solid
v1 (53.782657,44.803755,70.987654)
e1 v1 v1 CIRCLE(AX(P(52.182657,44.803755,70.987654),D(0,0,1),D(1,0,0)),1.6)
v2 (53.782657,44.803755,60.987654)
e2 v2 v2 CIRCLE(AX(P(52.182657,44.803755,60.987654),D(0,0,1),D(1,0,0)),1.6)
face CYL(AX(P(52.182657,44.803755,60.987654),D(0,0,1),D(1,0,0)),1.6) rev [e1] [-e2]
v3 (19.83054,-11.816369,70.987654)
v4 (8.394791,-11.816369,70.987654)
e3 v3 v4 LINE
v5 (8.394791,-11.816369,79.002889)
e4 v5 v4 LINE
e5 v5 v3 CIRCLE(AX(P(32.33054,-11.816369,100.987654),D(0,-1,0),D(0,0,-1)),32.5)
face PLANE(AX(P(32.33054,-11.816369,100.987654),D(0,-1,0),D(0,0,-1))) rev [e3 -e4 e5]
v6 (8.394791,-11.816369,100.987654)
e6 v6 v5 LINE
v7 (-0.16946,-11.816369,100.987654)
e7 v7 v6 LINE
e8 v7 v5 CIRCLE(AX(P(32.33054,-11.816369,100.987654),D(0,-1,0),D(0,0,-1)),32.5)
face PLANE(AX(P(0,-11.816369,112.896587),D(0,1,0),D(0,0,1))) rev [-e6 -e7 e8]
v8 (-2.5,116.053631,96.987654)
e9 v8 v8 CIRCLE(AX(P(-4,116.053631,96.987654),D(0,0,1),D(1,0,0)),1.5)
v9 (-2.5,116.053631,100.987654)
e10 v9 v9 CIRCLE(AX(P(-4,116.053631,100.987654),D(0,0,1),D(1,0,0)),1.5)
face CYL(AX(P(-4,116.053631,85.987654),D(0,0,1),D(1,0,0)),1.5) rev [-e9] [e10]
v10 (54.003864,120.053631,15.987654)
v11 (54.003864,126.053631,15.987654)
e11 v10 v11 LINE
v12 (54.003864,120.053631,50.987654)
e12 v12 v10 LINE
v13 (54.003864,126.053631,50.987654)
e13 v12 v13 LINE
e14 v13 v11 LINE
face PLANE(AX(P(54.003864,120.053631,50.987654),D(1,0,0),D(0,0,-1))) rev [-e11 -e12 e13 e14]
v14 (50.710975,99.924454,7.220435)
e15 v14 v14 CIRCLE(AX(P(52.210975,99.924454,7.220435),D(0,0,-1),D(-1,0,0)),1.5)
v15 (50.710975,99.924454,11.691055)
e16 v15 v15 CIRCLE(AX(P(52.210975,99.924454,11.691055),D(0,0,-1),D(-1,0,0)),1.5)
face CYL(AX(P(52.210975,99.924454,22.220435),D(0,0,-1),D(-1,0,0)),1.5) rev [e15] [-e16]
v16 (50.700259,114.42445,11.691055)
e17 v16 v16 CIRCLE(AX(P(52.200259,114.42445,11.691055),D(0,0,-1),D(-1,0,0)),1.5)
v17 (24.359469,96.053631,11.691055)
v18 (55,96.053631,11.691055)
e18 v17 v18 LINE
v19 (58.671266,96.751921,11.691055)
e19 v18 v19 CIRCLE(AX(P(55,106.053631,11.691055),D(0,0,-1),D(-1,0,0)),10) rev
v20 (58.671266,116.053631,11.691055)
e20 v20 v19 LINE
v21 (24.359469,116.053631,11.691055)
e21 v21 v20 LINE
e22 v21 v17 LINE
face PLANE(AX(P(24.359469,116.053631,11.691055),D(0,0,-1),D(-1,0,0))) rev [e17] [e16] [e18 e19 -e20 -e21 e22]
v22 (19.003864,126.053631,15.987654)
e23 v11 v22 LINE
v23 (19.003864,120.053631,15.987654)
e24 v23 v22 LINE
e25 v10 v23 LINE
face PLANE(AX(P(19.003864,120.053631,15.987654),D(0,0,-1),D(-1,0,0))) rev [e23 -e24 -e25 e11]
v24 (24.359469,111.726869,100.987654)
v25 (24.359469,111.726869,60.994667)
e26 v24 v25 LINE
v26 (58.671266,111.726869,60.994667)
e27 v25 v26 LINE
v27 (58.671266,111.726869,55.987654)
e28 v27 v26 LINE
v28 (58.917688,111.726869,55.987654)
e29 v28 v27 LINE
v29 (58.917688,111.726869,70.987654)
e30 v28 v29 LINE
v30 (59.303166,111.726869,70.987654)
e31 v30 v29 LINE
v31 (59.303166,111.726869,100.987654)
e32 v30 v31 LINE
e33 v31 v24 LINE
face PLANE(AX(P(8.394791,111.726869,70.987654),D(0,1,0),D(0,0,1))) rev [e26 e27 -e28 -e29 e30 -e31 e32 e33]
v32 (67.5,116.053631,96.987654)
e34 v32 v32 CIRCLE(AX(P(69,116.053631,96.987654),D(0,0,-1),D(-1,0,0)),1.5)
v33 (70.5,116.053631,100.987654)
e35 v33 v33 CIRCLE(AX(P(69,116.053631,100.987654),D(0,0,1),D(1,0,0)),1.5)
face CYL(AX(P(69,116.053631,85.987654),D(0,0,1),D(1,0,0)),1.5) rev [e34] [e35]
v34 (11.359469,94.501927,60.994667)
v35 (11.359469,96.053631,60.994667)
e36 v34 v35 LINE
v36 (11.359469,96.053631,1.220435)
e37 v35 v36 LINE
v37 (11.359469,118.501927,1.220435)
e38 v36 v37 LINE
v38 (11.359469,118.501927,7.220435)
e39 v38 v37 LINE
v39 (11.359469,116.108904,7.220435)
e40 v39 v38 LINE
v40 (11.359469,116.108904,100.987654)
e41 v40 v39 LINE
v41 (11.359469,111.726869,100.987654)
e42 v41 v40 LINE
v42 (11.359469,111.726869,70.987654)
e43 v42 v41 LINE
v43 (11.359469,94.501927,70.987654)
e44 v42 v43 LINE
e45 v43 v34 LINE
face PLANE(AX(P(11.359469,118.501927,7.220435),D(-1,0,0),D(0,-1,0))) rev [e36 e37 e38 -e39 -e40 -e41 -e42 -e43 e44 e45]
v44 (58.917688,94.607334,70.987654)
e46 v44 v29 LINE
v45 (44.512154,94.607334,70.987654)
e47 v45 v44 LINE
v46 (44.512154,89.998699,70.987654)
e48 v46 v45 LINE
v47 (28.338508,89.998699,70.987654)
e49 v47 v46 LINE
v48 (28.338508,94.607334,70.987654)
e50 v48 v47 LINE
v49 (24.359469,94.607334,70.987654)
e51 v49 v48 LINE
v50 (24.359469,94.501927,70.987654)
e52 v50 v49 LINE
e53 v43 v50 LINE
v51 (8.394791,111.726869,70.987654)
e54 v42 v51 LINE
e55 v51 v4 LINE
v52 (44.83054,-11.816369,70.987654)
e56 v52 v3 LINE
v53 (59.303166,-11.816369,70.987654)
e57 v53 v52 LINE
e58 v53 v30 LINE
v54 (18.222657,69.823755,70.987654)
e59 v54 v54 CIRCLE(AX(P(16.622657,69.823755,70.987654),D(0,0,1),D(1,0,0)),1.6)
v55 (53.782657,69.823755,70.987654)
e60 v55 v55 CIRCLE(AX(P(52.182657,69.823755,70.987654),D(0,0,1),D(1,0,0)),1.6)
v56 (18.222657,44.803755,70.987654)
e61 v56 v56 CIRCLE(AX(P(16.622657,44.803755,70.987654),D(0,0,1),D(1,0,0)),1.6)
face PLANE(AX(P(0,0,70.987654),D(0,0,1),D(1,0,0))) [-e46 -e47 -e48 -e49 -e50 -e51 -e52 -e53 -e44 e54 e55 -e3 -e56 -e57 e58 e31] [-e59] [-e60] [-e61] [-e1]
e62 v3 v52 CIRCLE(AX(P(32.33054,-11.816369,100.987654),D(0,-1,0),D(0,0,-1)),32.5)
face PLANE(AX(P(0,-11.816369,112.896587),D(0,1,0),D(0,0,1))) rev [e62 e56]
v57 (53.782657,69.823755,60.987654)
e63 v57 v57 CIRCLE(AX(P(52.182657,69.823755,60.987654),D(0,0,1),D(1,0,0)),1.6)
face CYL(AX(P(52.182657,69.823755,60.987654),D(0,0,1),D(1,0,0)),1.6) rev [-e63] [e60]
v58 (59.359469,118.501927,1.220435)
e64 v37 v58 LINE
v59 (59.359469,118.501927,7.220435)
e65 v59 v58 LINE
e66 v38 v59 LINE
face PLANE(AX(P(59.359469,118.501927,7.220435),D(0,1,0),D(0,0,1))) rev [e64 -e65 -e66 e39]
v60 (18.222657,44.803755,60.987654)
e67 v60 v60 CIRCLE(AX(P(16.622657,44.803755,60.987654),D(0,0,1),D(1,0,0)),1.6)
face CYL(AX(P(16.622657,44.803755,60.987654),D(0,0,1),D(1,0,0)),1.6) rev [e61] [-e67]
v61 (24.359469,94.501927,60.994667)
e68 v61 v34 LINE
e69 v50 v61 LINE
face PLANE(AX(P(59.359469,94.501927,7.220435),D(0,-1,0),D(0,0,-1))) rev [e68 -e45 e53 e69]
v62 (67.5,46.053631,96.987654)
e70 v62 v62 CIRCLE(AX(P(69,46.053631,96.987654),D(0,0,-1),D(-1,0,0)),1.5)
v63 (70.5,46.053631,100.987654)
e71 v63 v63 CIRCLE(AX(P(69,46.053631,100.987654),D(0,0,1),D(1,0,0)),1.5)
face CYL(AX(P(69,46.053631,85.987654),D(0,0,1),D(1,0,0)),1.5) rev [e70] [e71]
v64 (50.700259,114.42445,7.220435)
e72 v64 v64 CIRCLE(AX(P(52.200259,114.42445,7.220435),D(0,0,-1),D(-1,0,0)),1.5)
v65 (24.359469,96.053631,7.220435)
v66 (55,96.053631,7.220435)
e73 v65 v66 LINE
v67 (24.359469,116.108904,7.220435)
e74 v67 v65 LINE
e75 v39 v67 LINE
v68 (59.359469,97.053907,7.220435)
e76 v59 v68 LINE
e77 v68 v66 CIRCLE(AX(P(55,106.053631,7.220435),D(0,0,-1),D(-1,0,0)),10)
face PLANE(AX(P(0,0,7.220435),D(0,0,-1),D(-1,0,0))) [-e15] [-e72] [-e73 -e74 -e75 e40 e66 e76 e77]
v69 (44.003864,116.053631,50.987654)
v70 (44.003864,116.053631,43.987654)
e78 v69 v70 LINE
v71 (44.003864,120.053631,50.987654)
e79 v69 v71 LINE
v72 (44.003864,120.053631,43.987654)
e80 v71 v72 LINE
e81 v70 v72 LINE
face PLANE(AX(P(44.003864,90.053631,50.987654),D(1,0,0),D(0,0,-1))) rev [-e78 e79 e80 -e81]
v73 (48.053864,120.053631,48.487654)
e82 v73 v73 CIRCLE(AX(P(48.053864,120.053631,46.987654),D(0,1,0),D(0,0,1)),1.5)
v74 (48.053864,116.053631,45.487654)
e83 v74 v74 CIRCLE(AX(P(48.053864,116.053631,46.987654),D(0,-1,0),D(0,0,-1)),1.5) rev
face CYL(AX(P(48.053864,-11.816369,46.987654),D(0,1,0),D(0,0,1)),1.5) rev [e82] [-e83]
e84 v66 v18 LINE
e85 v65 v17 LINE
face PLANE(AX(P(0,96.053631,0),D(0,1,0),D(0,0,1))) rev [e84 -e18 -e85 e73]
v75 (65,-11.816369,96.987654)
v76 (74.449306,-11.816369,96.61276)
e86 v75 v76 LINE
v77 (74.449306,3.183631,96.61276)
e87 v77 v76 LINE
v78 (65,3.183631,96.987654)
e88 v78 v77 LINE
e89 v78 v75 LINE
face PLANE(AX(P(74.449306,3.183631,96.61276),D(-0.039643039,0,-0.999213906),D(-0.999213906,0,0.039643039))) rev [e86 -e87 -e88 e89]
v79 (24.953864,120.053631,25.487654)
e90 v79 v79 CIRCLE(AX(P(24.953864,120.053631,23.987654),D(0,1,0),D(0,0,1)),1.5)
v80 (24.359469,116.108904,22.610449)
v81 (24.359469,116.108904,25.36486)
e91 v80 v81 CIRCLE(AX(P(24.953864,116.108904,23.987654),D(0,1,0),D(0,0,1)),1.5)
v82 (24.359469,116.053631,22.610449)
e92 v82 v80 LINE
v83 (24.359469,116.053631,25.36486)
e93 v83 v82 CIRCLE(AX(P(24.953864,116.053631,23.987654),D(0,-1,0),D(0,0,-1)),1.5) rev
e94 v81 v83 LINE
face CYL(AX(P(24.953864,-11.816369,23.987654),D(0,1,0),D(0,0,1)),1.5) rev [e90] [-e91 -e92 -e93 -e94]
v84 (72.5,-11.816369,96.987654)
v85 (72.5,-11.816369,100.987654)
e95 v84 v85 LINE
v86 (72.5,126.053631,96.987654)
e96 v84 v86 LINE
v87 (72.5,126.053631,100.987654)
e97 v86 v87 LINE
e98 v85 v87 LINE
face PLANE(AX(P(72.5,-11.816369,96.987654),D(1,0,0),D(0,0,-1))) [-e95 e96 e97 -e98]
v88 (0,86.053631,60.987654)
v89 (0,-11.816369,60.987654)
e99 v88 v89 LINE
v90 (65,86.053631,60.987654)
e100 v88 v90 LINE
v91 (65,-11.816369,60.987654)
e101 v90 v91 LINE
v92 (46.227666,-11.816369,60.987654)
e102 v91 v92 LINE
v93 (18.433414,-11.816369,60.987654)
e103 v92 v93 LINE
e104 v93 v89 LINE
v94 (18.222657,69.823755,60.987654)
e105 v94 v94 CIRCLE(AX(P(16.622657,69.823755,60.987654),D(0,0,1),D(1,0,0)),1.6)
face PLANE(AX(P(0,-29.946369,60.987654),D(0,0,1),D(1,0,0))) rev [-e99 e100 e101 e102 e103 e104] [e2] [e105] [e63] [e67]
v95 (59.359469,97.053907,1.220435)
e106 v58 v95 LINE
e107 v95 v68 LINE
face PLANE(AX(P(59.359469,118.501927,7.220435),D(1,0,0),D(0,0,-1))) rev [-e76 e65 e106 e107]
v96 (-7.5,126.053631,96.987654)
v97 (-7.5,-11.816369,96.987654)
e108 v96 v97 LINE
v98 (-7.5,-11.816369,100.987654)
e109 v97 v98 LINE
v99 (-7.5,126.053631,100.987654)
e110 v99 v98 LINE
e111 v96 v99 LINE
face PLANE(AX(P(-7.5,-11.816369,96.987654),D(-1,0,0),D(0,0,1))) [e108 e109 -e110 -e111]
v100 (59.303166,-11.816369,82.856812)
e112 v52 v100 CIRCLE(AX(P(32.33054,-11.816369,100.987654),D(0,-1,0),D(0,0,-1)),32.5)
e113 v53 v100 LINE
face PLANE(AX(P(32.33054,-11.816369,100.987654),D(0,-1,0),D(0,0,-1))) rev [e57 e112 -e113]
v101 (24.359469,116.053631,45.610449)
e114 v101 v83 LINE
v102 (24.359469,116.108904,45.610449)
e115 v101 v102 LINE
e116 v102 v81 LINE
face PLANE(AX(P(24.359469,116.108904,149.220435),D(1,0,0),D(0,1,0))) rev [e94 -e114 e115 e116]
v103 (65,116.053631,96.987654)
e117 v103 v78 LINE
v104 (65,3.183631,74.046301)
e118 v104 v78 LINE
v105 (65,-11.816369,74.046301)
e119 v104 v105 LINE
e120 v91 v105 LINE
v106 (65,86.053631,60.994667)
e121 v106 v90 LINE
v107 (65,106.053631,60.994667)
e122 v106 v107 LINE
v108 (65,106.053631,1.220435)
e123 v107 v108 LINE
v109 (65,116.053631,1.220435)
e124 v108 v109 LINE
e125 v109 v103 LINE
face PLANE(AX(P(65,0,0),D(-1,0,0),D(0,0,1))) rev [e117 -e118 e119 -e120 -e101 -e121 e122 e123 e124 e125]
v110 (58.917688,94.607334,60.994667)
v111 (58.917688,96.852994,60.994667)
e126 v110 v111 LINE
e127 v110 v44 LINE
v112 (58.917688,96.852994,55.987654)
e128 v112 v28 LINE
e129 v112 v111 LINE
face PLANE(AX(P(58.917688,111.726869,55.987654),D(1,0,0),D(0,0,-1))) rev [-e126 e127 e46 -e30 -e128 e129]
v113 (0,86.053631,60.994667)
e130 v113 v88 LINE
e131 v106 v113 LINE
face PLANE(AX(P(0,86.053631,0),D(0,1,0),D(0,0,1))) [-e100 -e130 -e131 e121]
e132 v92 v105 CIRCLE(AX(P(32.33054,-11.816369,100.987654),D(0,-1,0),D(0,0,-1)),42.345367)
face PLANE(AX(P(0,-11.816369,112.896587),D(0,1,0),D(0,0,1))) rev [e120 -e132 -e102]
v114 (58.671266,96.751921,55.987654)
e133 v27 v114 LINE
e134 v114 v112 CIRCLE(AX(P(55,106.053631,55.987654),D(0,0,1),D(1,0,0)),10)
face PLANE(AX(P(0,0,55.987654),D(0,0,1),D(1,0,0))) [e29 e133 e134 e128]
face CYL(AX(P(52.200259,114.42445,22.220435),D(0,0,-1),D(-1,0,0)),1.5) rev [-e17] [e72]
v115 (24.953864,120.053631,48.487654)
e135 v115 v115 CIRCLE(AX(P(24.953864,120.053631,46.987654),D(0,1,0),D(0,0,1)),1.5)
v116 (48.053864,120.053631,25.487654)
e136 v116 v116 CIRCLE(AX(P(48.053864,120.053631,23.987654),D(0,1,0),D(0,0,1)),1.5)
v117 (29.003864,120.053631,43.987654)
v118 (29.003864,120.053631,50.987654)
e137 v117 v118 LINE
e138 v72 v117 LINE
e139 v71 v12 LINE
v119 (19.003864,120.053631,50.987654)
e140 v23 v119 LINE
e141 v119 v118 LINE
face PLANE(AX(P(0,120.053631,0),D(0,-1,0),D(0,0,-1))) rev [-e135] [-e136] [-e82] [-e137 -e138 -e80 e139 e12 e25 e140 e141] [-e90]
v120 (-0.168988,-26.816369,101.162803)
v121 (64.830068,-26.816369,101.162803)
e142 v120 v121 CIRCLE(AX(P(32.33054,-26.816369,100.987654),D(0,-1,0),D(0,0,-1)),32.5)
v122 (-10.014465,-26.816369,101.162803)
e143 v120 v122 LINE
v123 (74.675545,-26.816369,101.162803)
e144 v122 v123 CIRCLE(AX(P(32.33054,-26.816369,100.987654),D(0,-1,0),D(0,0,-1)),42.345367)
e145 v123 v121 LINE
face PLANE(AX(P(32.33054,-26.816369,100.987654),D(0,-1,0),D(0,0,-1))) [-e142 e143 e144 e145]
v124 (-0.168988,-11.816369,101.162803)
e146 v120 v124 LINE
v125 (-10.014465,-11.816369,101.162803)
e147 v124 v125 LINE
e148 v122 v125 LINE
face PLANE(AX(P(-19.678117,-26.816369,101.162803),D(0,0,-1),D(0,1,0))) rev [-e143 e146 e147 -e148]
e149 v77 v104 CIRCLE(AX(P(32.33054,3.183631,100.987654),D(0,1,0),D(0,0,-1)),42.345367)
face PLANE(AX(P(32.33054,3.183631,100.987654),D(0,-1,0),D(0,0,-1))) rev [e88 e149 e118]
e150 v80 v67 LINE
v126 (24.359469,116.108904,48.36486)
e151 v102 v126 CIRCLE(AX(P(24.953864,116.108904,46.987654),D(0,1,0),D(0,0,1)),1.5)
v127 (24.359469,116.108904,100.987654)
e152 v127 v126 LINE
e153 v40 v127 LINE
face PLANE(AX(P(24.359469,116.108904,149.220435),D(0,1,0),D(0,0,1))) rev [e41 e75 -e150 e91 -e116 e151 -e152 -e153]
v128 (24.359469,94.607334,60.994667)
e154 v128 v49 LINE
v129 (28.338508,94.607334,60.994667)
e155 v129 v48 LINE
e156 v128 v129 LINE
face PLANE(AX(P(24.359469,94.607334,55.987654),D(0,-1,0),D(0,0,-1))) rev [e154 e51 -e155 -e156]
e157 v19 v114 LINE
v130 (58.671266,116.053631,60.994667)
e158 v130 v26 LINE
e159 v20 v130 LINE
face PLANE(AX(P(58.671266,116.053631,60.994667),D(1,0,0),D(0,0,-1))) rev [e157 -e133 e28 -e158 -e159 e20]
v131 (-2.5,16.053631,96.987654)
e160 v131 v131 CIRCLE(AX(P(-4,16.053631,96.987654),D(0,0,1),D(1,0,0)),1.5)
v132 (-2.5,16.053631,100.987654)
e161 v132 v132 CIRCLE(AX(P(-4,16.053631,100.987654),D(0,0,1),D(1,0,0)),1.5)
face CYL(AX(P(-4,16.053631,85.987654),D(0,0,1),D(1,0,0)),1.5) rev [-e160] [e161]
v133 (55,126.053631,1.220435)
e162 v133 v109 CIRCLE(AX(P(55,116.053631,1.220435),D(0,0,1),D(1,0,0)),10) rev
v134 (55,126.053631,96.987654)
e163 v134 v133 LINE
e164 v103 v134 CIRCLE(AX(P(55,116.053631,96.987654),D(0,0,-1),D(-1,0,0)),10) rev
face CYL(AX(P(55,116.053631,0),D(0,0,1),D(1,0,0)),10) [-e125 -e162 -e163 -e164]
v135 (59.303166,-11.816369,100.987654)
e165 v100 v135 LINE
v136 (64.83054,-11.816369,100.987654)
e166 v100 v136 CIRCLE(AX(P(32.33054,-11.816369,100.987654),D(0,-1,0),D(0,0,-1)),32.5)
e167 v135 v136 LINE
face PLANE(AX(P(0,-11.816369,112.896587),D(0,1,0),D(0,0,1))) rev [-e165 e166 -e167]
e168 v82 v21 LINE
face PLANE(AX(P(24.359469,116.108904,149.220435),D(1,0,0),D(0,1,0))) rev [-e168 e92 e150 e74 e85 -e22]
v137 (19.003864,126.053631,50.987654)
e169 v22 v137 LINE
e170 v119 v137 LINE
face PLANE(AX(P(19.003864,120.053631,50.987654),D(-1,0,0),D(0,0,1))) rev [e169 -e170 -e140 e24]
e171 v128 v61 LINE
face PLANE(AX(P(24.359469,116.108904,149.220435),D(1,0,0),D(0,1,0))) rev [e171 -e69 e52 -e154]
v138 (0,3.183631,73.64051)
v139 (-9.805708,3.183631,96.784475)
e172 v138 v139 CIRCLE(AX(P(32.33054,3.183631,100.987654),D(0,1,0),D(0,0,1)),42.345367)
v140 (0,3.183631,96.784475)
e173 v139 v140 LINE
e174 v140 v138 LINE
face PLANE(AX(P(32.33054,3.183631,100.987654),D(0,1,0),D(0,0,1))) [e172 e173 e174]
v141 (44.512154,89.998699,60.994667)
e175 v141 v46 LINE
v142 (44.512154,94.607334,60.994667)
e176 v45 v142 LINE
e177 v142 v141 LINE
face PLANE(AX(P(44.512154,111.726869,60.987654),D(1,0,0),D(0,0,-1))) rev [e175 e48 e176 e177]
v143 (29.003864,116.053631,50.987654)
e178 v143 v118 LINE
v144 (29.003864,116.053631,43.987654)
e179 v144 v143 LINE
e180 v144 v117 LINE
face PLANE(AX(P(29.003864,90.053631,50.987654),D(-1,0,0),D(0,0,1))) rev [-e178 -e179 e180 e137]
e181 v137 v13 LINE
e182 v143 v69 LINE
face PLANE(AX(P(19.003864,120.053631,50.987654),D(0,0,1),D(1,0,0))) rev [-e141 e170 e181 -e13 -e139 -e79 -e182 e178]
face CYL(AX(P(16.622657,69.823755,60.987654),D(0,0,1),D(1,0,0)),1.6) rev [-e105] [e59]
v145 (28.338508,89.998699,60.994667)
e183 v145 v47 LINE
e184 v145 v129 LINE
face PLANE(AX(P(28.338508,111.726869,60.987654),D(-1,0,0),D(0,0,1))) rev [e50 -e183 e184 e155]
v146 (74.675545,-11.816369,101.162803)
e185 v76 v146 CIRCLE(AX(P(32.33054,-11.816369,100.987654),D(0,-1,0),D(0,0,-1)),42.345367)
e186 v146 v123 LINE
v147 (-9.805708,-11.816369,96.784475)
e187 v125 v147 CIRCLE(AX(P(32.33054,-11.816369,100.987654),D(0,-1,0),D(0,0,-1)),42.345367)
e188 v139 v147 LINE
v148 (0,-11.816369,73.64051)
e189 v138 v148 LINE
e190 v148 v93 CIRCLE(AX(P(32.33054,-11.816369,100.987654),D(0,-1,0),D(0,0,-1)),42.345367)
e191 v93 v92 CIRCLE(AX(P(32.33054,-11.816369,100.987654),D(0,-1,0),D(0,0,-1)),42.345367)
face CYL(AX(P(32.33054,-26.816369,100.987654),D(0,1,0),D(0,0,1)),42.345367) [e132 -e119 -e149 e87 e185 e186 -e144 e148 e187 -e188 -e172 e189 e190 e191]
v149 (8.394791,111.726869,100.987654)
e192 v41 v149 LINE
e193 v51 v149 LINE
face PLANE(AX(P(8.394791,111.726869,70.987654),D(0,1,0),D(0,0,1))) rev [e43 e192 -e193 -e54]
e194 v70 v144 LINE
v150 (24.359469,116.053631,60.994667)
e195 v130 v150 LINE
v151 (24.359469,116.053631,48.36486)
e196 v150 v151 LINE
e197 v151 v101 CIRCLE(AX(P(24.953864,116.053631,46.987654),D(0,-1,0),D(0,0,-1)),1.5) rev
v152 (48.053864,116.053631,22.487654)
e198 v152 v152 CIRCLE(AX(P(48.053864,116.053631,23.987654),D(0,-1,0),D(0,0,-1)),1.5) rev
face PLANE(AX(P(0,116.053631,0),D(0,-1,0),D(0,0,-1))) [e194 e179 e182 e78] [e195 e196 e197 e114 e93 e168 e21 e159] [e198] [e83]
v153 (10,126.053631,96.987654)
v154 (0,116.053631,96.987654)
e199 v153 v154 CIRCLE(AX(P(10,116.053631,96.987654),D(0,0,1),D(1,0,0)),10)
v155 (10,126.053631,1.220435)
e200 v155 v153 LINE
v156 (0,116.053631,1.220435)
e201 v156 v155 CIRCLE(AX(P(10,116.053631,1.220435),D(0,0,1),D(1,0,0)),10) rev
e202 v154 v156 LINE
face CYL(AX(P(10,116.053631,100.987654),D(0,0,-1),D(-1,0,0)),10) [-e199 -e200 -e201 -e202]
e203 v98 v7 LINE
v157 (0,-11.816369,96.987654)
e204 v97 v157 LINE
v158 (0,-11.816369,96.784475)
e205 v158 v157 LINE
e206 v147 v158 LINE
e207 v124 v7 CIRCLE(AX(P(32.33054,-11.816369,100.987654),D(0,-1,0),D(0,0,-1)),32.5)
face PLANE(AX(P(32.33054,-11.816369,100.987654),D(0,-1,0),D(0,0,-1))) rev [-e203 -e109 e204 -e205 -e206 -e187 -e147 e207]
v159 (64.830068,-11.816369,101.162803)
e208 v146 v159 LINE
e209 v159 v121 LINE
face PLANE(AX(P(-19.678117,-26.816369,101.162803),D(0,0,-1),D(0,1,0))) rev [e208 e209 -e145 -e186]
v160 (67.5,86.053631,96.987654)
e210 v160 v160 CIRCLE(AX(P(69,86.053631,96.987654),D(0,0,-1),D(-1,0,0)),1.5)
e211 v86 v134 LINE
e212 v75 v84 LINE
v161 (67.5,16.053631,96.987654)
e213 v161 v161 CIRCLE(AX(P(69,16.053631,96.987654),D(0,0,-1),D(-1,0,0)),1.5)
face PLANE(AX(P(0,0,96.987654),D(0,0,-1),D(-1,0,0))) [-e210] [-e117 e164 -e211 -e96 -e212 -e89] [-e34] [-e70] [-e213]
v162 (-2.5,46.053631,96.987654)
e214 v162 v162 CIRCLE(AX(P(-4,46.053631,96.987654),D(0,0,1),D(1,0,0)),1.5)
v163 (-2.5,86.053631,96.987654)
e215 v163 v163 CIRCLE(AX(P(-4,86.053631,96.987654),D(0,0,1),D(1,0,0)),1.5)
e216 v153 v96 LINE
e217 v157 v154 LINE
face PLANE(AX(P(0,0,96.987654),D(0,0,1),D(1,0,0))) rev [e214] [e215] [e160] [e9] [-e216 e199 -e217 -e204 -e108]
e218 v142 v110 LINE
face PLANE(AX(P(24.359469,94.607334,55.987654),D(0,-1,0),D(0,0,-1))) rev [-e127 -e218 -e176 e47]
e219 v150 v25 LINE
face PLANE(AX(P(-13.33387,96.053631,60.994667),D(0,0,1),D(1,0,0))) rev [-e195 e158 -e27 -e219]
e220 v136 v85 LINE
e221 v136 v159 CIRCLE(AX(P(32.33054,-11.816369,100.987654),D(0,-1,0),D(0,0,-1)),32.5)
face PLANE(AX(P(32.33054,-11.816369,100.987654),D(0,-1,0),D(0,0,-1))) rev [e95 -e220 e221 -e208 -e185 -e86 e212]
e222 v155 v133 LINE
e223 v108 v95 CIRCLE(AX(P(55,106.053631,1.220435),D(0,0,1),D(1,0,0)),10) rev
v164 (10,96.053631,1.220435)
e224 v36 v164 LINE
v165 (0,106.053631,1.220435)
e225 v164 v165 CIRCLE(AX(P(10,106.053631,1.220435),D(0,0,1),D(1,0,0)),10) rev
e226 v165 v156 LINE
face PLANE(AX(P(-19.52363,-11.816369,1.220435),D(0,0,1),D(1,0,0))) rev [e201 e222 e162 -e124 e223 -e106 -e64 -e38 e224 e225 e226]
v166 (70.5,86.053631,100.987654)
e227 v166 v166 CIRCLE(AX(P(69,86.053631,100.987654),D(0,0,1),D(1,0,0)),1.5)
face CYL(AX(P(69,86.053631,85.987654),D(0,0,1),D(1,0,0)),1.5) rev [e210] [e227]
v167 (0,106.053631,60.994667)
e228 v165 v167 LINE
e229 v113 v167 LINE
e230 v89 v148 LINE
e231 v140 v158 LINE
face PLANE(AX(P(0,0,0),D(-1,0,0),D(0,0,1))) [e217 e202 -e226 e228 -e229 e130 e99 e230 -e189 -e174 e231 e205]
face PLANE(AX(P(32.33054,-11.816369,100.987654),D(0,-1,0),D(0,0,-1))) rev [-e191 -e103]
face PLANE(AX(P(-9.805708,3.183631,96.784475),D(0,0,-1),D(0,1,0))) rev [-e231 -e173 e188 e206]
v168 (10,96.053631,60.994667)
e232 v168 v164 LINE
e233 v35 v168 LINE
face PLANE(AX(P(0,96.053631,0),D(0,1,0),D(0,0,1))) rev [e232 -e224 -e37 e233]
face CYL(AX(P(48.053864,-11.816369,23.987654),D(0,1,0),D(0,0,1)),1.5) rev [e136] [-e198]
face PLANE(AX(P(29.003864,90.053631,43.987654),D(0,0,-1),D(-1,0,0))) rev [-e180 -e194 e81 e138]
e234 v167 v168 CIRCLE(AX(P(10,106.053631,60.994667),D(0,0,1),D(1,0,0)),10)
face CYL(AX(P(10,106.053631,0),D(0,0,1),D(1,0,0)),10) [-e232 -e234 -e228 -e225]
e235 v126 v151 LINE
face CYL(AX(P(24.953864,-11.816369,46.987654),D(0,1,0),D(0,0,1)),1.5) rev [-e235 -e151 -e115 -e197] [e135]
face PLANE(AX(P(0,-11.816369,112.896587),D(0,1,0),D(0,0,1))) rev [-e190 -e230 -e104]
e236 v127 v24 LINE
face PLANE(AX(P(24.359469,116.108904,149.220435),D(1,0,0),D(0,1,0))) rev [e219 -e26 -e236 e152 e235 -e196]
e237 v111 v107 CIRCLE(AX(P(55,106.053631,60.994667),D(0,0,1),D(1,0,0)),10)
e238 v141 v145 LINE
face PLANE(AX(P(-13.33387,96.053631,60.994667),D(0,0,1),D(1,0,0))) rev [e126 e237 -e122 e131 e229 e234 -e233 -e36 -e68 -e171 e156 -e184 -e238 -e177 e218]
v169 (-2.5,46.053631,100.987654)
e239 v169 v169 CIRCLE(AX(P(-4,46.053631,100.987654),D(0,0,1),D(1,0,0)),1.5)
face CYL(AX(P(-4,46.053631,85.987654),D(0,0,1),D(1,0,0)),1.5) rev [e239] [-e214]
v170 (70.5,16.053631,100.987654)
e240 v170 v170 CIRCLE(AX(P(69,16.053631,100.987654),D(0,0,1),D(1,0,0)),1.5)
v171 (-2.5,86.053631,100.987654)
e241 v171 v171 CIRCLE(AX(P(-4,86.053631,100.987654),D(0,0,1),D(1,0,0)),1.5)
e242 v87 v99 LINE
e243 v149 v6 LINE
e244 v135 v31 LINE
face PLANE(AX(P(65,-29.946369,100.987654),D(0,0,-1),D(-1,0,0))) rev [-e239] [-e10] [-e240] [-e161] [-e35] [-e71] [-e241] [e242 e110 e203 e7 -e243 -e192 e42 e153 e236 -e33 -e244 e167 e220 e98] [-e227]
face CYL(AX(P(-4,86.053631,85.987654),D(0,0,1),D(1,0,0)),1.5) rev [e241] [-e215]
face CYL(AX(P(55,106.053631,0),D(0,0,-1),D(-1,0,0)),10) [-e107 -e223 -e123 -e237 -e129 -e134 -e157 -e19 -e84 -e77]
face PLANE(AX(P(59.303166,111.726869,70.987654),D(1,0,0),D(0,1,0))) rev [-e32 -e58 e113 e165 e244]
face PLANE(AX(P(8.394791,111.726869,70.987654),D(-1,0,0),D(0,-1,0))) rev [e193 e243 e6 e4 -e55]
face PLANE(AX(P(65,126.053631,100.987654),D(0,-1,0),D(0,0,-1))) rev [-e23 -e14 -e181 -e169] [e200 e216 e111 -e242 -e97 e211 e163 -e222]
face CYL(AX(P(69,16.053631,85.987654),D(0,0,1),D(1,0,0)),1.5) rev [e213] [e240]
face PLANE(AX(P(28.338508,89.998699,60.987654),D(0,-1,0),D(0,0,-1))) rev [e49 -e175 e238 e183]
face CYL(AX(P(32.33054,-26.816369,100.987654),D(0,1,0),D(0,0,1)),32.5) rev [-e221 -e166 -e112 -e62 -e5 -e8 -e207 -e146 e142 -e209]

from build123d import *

# Parameters (mm, degrees)
SKETCH_1_W           = 158.76721969
SKETCH_1_H           = 156
EXTRUDE_1_DEPTH      = 65
SKETCH_2_W           = 158.85328248
SKETCH_2_H           = 116
CUT_EXTRUDE_1_DEPTH  = 175.106359002
SKETCH_3_W           = 50.908374927
SKETCH_3_H           = 145.199783254
CUT_EXTRUDE_2_DEPTH  = 30
SKETCH_4_W           = 35
SKETCH_4_H           = 35
CUT_EXTRUDE_3_DEPTH  = 6
SKETCH_5_W           = 15
SKETCH_5_H           = 7
CUT_EXTRUDE_4_DEPTH  = 30
SKETCH_6_W           = 16.173646408
SKETCH_6_H           = 21.728169507
CUT_EXTRUDE_5_DEPTH  = 10
SKETCH_12_W          = 86.243953328
SKETCH_12_H          = 39.310546327
CUT_EXTRUDE_8_DEPTH  = 175.106359002
SKETCH_9_W           = 48
SKETCH_9_H           = 24
CUT_EXTRUDE_6_DEPTH  = 65
SKETCH_10_W          = 13
SKETCH_10_H          = 21.606977086
CUT_EXTRUDE_7_DEPTH  = 142
SKETCH_14_W          = 115.071710401
SKETCH_14_H          = 109.204529419
CUT_EXTRUDE_9_DEPTH  = 183.843220343
SKETCH_17_W          = 7.5
SKETCH_17_H          = 137.87
EXTRUDE_2_DEPTH      = 4
SKETCH_16_R          = 1.5
CUT_EXTRUDE_10_DEPTH = 182.230387146
SKETCH_18_W          = 105.560370757
SKETCH_18_H          = 69.761390661
CUT_EXTRUDE_11_DEPTH = 10
SKETCH_20_W          = 34.311797321
SKETCH_20_H          = 49.303612094
CUT_EXTRUDE_12_DEPTH = 20
SKETCH_21_R          = 1.5
CUT_EXTRUDE_13_DEPTH = 15
SKETCH_22_W          = 34.558218505
SKETCH_22_H          = 17.119534262
CUT_EXTRUDE_14_DEPTH = 15
SKETCH_23_R          = 1.5
CUT_EXTRUDE_15_DEPTH = 15
SKETCH_28_R          = 1.6
CUT_EXTRUDE_17_DEPTH = 10
FILLET_5_R           = 10
FILLET_6_R           = 10
SKETCH_24_R          = 42.345367042
SKETCH_24_R_2        = 32.5
EXTRUDE_3_DEPTH      = 15
EXTRUDE_START        = 15
EXTRUDE_4_DEPTH      = 15
EXTRUDE_5_DEPTH      = 15
SKETCH_31_W          = 132.972003353
SKETCH_31_H          = 50.361945542
CUT_EXTRUDE_18_DEPTH = 15


with BuildPart() as part:
    # 草图1 → 凸台-拉伸1 (new body)
    with BuildSketch(Plane(origin=(0, 0, 0), x_dir=(0, 0, -1), z_dir=(1, 0, 0))):
        with Locations((-21.604044476, 48.053631124)):
            Rectangle(SKETCH_1_W, SKETCH_1_H)
    extrude(amount=EXTRUDE_1_DEPTH)

    # 草图2 → 切除-拉伸1 (cut, through all)
    with BuildSketch(Plane(origin=(65, 0, 0), x_dir=(0, 0, -1), z_dir=(1, 0, 0))):
        with Locations((18.438986919, 28.053631124)):
            Rectangle(SKETCH_2_W, SKETCH_2_H)
    extrude(amount=-CUT_EXTRUDE_1_DEPTH, mode=Mode.SUBTRACT)

    # 草图3 → 切除-拉伸2 (cut)
    with BuildSketch(Plane.XY.offset(100.987654321)):
        with Locations((33.848978786, 39.12697696)):
            Rectangle(SKETCH_3_W, SKETCH_3_H)
    extrude(amount=-CUT_EXTRUDE_2_DEPTH, mode=Mode.SUBTRACT)

    # 草图4 → 切除-拉伸3 (cut)
    with BuildSketch(Plane(origin=(0, 126.053631124, 0), x_dir=(1, 0, 0), z_dir=(0, 1, 0))):
        with Locations((36.50386385, -33.487654321)):
            Rectangle(SKETCH_4_W, SKETCH_4_H)
    extrude(amount=-CUT_EXTRUDE_3_DEPTH, mode=Mode.SUBTRACT)

    # 草图5 → 切除-拉伸4 (cut)
    with BuildSketch(Plane(origin=(0, 120.053631124, 0), x_dir=(1, 0, 0), z_dir=(0, 1, 0))):
        with Locations((36.50386385, -47.487654321)):
            Rectangle(SKETCH_5_W, SKETCH_5_H)
    extrude(amount=-CUT_EXTRUDE_4_DEPTH, mode=Mode.SUBTRACT)

    # 草图6 → 切除-拉伸5 (cut)
    with BuildSketch(Plane.XY.offset(70.987654321)):
        with Locations((36.425330815, 100.862783834)):
            Rectangle(SKETCH_6_W, SKETCH_6_H)
    extrude(amount=-CUT_EXTRUDE_5_DEPTH, mode=Mode.SUBTRACT)

    # 草图12 → 切除-拉伸8 (cut, through all)
    with BuildSketch(Plane(origin=(65, 0, 0), x_dir=(0, 0, -1), z_dir=(1, 0, 0))):
        with Locations((-69.77461077, -31.47164204)):
            Rectangle(SKETCH_12_W, SKETCH_12_H)
    extrude(amount=-CUT_EXTRUDE_8_DEPTH, mode=Mode.SUBTRACT)

    # 草图9 → 切除-拉伸6 (cut)
    with BuildSketch(Plane(origin=(0, 0, -57.779565369), x_dir=(-1, 0, 0), z_dir=(0, 0, -1))):
        with Locations((-35.359469061, 106.501927087)):
            Rectangle(SKETCH_9_W, SKETCH_9_H)
    extrude(amount=-CUT_EXTRUDE_6_DEPTH, mode=Mode.SUBTRACT)

    # 草图10 → 切除-拉伸7 (cut)
    with BuildSketch(Plane(origin=(0, 0, 7.220434631), x_dir=(-1, 0, 0), z_dir=(0, 0, -1))):
        with Locations((-17.859469061, 105.30541563)):
            Rectangle(SKETCH_10_W, SKETCH_10_H)
    extrude(amount=-CUT_EXTRUDE_7_DEPTH, mode=Mode.SUBTRACT)

    # 草图14 → 切除-拉伸9 (cut, through all)
    with BuildSketch(Plane(origin=(0, 126.053631124, 0), x_dir=(1, 0, 0), z_dir=(0, 1, 0))):
        with Locations((38.012225103, 53.381830079)):
            Rectangle(SKETCH_14_W, SKETCH_14_H)
    extrude(amount=-CUT_EXTRUDE_9_DEPTH, mode=Mode.SUBTRACT)

    # 草图17 → 凸台-拉伸2 (add)
    with BuildSketch(Plane.XY.offset(100.987654321)):
        with Locations((-3.75, 57.118631124)):
            Rectangle(SKETCH_17_W, SKETCH_17_H)
        with Locations((68.75, 57.118631124)):
            Rectangle(SKETCH_17_W, SKETCH_17_H)
    extrude(amount=-EXTRUDE_2_DEPTH)

    # 草图16 → 切除-拉伸10 (cut, through all)
    with BuildSketch(Plane(origin=(0, 120.053631124, 0), x_dir=(1, 0, 0), z_dir=(0, 1, 0))):
        with Locations(Location((24.95386385, -46.987654321, 0), (0, 0, 270))):
            Circle(SKETCH_16_R)
        with Locations(Location((48.05386385, -46.987654321, 0), (0, 0, 270))):
            Circle(SKETCH_16_R)
        with Locations(Location((24.95386385, -23.987654321, 0), (0, 0, 270))):
            Circle(SKETCH_16_R)
        with Locations(Location((48.05386385, -23.987654321, 0), (0, 0, 270))):
            Circle(SKETCH_16_R)
    extrude(amount=-CUT_EXTRUDE_10_DEPTH, mode=Mode.SUBTRACT)

    # 草图18 → 切除-拉伸11 (cut)
    with BuildSketch(Plane.XZ.offset(-86.053631124)):
        with Locations((39.446315854, 26.113971664)):
            Rectangle(SKETCH_18_W, SKETCH_18_H)
    extrude(amount=-CUT_EXTRUDE_11_DEPTH, mode=Mode.SUBTRACT)

    # 草图20 → 切除-拉伸12 (cut)
    with BuildSketch(Plane.XZ.offset(-96.053631124)):
        with Locations((41.515367722, 36.342860947)):
            Rectangle(SKETCH_20_W, SKETCH_20_H)
    extrude(amount=-CUT_EXTRUDE_12_DEPTH, mode=Mode.SUBTRACT)

    # 草图21 → 切除-拉伸13 (cut)
    with BuildSketch(Plane(origin=(0, 0, 7.220434631), x_dir=(-1, 0, 0), z_dir=(0, 0, -1))):
        with Locations((-52.200258978, 114.424449587)):
            Circle(SKETCH_21_R)
        with Locations((-52.210974666, 99.924453546)):
            Circle(SKETCH_21_R)
    extrude(amount=-CUT_EXTRUDE_13_DEPTH, mode=Mode.SUBTRACT)

    # 草图22 → 切除-拉伸14 (cut)
    with BuildSketch(Plane.XY.offset(70.987654321)):
        with Locations((41.638578314, 103.167101456)):
            Rectangle(SKETCH_22_W, SKETCH_22_H)
    extrude(amount=-CUT_EXTRUDE_14_DEPTH, mode=Mode.SUBTRACT)

    # 草图23 → 切除-拉伸15 (cut)
    with BuildSketch(Plane.XY.offset(100.987654321)):
        with Locations((69, 116.053631124)):
            Circle(SKETCH_23_R)
        with Locations((69, 86.053631124)):
            Circle(SKETCH_23_R)
        with Locations((69, 46.053631124)):
            Circle(SKETCH_23_R)
        with Locations((69, 16.053631124)):
            Circle(SKETCH_23_R)
        with Locations((-4, 116.053631124)):
            Circle(SKETCH_23_R)
        with Locations((-4, 86.053631124)):
            Circle(SKETCH_23_R)
        with Locations((-4, 46.053631124)):
            Circle(SKETCH_23_R)
        with Locations((-4, 16.053631124)):
            Circle(SKETCH_23_R)
    extrude(amount=-CUT_EXTRUDE_15_DEPTH, mode=Mode.SUBTRACT)

    # 草图28 → 切除-拉伸17 (cut)
    with BuildSketch(Plane.XY.offset(70.987654321)):
        with Locations((16.622657387, 69.823755444)):
            Circle(SKETCH_28_R)
        with Locations((52.182657387, 69.823755444)):
            Circle(SKETCH_28_R)
        with Locations((16.622657387, 44.803755444)):
            Circle(SKETCH_28_R)
        with Locations((52.182657387, 44.803755444)):
            Circle(SKETCH_28_R)
    extrude(amount=-CUT_EXTRUDE_17_DEPTH, mode=Mode.SUBTRACT)

    # 圆角5
    fillet_5_edges = [part.edges().sort_by_distance(p)[0] for p in [
        (0, 126.053631124, 49.104044476),
        (65, 126.053631124, 49.104044476),
    ]]
    fillet(fillet_5_edges, radius=FILLET_5_R)

    # 圆角6
    # the kernel refuses this fillet: 10 mm, written as the material it takes off along each edge
    with BuildSketch(Plane(origin=(65, 96.053631124, 60.994666994), x_dir=(-1, 0, 0), z_dir=(0, 0, -1)), Plane(origin=(0, 96.053631124, 60.994666994), x_dir=(0, 1, 0), z_dir=(0, 0, -1))) as fillet_6_piece_1:
        with BuildLine():
            CenterArc((FILLET_6_R, FILLET_6_R), FILLET_6_R, 180, 90)
            Line((0, FILLET_6_R), (0, 0))
            Line((0, 0), (FILLET_6_R, 0))
        make_face()
    extrude(amount=84.774232362, mode=Mode.SUBTRACT)

    # 草图24 → 凸台-拉伸3 (add)
    with BuildSketch(Plane.XZ.offset(11.816368876)):
        with Locations(Location((32.330540247, 100.987654321, 0), (0, 0, 320.488798593))):
            Circle(SKETCH_24_R)
        with Locations((32.330540247, 100.987654321)):
            Circle(SKETCH_24_R_2, mode=Mode.SUBTRACT)
    extrude(amount=EXTRUDE_3_DEPTH)

    # 草图29 → 凸台-拉伸4 (add)
    with BuildSketch(Plane(origin=(0, -11.816368876, 0), x_dir=(1, 0, 0), z_dir=(0, 1, 0)).offset(EXTRUDE_START)):
        with BuildLine():
            Line((0, -73.640510462), (0, -96.784474951))
            Line((0, -96.784474951), (-9.805707724, -96.784474951))
            ThreePointArc((-9.805707724, -96.784474951), (-6.659668908, -84.468159778), (0, -73.640510462))
        make_face()
    extrude(amount=-EXTRUDE_4_DEPTH)

    # 草图30 → 凸台-拉伸5 (add)
    with BuildSketch(Plane(origin=(0, -11.816368876, 0), x_dir=(1, 0, 0), z_dir=(0, 1, 0)).offset(EXTRUDE_START)):
        with BuildLine():
            Line((74.449305819, -96.612760422), (65, -96.987654321))
            Line((65, -96.987654321), (65, -74.046301175))
            ThreePointArc((65, -74.046301175), (71.389866055, -84.632252236), (74.449305819, -96.612760422))
        make_face()
    extrude(amount=-EXTRUDE_5_DEPTH)

    # 草图31 → 切除-拉伸18 (cut)
    with BuildSketch(Plane(origin=(0, -11.816368876, 0), x_dir=(1, 0, 0), z_dir=(0, 1, 0))):
        with Locations((46.807884266, -126.3437758)):
            Rectangle(SKETCH_31_W, SKETCH_31_H)
    extrude(amount=-CUT_EXTRUDE_18_DEPTH, mode=Mode.SUBTRACT)


solid = part.part
